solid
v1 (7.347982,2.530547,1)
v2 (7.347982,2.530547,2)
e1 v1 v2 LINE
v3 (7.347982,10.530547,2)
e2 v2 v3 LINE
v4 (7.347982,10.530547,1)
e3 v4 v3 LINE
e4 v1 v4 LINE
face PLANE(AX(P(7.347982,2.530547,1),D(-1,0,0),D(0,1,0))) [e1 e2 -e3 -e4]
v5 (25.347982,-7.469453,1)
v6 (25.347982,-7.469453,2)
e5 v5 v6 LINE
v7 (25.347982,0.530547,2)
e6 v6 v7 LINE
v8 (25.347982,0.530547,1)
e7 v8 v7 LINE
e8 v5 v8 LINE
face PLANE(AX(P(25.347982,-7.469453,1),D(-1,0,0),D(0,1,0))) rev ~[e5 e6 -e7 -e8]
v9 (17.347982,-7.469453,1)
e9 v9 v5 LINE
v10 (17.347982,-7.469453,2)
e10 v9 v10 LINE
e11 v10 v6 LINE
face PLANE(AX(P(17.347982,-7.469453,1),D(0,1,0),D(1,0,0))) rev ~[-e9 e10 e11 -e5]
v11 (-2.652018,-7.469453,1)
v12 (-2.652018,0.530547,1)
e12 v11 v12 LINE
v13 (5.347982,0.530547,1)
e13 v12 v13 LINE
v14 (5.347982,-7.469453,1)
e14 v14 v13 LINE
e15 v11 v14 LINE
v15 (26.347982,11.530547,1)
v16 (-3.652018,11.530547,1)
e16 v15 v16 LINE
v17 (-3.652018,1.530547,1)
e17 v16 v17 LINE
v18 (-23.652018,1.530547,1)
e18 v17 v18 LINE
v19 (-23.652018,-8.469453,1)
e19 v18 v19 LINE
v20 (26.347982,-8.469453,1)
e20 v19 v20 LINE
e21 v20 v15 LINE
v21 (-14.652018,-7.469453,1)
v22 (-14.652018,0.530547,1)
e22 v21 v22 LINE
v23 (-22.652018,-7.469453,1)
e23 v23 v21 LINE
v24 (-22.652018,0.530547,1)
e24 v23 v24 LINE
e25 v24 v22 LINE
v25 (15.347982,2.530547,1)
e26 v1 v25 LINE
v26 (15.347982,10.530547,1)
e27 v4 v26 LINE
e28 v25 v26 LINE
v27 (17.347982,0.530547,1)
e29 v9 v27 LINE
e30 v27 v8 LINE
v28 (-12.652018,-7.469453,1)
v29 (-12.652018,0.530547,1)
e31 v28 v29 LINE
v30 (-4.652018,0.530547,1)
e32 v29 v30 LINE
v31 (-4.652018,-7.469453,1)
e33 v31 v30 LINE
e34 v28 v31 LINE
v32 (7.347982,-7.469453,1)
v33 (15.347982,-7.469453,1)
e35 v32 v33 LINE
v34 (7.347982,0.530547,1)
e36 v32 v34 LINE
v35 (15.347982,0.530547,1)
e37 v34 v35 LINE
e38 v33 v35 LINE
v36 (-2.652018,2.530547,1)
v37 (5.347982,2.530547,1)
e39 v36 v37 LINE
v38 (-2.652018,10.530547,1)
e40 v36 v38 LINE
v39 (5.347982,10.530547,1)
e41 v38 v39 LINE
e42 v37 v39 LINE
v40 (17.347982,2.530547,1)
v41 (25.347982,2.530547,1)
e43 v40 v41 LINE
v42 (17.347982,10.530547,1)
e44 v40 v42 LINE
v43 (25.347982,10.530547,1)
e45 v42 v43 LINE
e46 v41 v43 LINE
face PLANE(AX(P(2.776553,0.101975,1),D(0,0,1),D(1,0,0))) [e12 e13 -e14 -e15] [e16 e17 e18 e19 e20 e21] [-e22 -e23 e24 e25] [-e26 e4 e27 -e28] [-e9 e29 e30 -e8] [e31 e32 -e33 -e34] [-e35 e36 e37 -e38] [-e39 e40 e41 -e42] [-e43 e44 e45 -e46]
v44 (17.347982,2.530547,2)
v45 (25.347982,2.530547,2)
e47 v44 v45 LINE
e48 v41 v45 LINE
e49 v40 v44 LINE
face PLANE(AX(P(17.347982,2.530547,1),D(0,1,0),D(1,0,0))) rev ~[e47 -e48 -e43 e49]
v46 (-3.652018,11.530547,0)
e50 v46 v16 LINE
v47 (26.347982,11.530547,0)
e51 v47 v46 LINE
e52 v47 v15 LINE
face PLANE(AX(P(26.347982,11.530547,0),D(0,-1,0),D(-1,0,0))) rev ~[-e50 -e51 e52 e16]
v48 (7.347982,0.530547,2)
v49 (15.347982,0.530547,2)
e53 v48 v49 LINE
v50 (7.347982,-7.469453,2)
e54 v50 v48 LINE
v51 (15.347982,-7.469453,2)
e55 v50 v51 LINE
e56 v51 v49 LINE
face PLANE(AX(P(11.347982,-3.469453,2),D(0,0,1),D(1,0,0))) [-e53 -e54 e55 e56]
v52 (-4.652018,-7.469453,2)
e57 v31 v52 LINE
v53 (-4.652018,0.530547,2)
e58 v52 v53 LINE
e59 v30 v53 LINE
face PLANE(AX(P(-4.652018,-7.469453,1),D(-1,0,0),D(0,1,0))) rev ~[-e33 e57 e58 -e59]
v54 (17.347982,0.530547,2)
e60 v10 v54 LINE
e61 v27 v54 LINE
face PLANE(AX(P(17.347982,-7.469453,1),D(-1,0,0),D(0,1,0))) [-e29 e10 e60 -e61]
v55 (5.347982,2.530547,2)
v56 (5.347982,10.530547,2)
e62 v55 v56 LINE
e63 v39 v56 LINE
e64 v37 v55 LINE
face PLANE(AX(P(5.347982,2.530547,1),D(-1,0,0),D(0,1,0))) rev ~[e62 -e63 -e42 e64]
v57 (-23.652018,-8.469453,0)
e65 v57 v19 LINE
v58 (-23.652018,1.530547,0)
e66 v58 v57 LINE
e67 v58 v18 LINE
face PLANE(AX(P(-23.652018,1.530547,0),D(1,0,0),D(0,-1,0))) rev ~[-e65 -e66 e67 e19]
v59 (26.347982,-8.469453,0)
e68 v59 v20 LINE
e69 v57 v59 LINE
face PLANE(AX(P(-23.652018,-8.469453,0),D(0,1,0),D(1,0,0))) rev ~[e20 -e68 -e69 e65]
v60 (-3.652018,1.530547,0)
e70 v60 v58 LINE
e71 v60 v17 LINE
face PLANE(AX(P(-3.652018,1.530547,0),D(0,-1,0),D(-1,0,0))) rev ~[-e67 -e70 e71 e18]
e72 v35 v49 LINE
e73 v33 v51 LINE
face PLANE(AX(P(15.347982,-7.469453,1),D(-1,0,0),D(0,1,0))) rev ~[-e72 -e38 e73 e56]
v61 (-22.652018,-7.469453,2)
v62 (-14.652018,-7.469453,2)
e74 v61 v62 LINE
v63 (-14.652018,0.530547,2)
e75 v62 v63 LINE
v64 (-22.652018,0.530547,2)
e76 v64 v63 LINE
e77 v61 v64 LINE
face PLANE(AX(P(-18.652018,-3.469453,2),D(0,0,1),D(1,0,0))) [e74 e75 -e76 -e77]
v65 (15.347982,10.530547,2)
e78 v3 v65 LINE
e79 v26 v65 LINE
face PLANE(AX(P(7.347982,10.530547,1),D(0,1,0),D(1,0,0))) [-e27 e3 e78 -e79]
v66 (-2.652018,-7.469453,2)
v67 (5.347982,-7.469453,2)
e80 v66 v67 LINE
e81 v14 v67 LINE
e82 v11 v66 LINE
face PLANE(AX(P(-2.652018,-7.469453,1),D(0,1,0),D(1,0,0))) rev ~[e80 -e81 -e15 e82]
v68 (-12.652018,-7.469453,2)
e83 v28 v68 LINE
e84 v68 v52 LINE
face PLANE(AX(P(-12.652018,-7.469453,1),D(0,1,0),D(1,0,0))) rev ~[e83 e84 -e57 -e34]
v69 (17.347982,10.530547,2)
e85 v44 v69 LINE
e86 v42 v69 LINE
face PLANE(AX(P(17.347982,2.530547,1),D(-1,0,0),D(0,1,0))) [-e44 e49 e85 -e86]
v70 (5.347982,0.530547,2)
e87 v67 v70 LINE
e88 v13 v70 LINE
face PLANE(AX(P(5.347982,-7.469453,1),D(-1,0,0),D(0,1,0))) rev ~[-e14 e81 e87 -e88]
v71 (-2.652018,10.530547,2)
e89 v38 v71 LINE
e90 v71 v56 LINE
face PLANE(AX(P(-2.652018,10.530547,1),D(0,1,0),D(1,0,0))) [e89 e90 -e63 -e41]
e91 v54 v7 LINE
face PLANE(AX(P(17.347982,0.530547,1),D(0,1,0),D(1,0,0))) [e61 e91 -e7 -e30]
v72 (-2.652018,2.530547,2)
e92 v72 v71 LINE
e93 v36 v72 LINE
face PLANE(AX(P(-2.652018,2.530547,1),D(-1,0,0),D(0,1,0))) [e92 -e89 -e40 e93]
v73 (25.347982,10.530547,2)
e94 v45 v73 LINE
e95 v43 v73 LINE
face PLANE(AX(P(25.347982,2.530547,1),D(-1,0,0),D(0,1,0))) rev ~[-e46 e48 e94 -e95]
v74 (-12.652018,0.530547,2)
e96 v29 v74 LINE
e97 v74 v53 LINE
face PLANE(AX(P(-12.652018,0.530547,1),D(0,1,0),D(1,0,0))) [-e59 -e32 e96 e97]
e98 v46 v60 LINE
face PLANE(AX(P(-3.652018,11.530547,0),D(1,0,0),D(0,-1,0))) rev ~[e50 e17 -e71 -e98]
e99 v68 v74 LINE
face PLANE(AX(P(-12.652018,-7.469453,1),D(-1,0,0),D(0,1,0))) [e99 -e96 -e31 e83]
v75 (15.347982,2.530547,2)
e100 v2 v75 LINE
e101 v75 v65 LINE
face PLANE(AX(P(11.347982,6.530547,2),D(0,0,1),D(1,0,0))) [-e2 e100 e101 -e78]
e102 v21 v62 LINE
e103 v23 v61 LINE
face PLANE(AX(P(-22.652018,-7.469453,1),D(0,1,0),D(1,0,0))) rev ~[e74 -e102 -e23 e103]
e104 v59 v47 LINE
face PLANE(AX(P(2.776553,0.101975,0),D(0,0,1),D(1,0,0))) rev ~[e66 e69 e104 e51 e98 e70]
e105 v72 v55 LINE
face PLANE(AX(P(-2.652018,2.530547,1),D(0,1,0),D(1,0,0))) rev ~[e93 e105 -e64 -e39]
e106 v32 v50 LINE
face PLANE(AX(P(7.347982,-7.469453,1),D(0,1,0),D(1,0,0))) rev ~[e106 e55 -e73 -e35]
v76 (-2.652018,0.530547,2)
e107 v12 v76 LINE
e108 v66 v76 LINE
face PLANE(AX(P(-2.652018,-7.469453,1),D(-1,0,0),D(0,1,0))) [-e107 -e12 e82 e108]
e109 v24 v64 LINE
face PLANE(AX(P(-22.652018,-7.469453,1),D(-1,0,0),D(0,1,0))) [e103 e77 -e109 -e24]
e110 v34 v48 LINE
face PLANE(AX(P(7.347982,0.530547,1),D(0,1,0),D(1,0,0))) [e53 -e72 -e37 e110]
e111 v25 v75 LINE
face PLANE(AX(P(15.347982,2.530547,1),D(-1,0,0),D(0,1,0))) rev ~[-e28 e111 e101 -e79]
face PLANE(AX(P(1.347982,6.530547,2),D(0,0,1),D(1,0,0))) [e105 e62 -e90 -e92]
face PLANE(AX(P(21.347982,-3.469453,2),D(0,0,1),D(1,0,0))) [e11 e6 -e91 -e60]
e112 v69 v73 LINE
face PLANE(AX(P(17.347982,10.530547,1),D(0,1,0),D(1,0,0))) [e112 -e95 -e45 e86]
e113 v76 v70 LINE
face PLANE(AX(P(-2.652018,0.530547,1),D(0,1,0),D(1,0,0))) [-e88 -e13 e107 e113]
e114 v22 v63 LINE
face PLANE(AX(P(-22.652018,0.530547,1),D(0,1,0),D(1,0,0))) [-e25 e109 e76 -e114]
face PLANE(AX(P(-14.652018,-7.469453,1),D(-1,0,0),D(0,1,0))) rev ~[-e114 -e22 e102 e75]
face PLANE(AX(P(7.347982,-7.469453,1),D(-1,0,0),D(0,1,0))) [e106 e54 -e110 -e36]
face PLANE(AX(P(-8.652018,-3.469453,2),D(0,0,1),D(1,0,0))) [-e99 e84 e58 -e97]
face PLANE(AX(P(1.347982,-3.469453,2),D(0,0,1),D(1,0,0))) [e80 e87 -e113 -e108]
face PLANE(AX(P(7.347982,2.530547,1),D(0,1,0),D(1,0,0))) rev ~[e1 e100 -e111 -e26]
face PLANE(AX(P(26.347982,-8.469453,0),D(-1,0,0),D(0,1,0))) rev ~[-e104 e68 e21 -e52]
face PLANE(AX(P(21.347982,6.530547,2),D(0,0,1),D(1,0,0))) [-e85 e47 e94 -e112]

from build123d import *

# Parameters (mm, degrees)
F1_DEPTH = 1
F2_W     = 8
F2_H     = 8
F3_DEPTH = 1


# Not quite as in the source:
# - a feature names something its author has since deleted; it is built from what else it names


with BuildPart() as f1:
    # F0 (on Top) → F1 (new body)
    with BuildSketch(Plane.XY):
        Polygon((-3.6520181931, 1.5305465425), (-23.6520181931, 1.5305465425), (-23.6520181931, -8.4694534575), (26.3479818069, -8.4694534575), (26.3479818069, 11.5305465425), (-3.6520181931, 11.5305465425), align=None)
    extrude(amount=F1_DEPTH)

    # F2 (on face) → F3 (join)
    with BuildSketch(Plane.XY.offset(1)):
        with Locations((-18.6520181931, -3.4694534575)):
            Rectangle(F2_W, F2_H)
        with Locations((-8.6520181931, -3.4694534575)):
            Rectangle(F2_W, F2_H)
        with Locations((1.3479818069, 6.5305465425)):
            Rectangle(F2_W, F2_H)
        with Locations((11.3479818069, 6.5305465425)):
            Rectangle(F2_W, F2_H)
        with Locations((11.3479818069, -3.4694534575)):
            Rectangle(F2_W, F2_H)
        with Locations((21.3479818069, -3.4694534575)):
            Rectangle(F2_W, F2_H)
        with Locations((21.3479818069, 6.5305465425)):
            Rectangle(F2_W, F2_H)
        with Locations((1.3479818069, -3.4694534575)):
            Rectangle(F2_W, F2_H)
    extrude(amount=F3_DEPTH)


solid = f1.part
